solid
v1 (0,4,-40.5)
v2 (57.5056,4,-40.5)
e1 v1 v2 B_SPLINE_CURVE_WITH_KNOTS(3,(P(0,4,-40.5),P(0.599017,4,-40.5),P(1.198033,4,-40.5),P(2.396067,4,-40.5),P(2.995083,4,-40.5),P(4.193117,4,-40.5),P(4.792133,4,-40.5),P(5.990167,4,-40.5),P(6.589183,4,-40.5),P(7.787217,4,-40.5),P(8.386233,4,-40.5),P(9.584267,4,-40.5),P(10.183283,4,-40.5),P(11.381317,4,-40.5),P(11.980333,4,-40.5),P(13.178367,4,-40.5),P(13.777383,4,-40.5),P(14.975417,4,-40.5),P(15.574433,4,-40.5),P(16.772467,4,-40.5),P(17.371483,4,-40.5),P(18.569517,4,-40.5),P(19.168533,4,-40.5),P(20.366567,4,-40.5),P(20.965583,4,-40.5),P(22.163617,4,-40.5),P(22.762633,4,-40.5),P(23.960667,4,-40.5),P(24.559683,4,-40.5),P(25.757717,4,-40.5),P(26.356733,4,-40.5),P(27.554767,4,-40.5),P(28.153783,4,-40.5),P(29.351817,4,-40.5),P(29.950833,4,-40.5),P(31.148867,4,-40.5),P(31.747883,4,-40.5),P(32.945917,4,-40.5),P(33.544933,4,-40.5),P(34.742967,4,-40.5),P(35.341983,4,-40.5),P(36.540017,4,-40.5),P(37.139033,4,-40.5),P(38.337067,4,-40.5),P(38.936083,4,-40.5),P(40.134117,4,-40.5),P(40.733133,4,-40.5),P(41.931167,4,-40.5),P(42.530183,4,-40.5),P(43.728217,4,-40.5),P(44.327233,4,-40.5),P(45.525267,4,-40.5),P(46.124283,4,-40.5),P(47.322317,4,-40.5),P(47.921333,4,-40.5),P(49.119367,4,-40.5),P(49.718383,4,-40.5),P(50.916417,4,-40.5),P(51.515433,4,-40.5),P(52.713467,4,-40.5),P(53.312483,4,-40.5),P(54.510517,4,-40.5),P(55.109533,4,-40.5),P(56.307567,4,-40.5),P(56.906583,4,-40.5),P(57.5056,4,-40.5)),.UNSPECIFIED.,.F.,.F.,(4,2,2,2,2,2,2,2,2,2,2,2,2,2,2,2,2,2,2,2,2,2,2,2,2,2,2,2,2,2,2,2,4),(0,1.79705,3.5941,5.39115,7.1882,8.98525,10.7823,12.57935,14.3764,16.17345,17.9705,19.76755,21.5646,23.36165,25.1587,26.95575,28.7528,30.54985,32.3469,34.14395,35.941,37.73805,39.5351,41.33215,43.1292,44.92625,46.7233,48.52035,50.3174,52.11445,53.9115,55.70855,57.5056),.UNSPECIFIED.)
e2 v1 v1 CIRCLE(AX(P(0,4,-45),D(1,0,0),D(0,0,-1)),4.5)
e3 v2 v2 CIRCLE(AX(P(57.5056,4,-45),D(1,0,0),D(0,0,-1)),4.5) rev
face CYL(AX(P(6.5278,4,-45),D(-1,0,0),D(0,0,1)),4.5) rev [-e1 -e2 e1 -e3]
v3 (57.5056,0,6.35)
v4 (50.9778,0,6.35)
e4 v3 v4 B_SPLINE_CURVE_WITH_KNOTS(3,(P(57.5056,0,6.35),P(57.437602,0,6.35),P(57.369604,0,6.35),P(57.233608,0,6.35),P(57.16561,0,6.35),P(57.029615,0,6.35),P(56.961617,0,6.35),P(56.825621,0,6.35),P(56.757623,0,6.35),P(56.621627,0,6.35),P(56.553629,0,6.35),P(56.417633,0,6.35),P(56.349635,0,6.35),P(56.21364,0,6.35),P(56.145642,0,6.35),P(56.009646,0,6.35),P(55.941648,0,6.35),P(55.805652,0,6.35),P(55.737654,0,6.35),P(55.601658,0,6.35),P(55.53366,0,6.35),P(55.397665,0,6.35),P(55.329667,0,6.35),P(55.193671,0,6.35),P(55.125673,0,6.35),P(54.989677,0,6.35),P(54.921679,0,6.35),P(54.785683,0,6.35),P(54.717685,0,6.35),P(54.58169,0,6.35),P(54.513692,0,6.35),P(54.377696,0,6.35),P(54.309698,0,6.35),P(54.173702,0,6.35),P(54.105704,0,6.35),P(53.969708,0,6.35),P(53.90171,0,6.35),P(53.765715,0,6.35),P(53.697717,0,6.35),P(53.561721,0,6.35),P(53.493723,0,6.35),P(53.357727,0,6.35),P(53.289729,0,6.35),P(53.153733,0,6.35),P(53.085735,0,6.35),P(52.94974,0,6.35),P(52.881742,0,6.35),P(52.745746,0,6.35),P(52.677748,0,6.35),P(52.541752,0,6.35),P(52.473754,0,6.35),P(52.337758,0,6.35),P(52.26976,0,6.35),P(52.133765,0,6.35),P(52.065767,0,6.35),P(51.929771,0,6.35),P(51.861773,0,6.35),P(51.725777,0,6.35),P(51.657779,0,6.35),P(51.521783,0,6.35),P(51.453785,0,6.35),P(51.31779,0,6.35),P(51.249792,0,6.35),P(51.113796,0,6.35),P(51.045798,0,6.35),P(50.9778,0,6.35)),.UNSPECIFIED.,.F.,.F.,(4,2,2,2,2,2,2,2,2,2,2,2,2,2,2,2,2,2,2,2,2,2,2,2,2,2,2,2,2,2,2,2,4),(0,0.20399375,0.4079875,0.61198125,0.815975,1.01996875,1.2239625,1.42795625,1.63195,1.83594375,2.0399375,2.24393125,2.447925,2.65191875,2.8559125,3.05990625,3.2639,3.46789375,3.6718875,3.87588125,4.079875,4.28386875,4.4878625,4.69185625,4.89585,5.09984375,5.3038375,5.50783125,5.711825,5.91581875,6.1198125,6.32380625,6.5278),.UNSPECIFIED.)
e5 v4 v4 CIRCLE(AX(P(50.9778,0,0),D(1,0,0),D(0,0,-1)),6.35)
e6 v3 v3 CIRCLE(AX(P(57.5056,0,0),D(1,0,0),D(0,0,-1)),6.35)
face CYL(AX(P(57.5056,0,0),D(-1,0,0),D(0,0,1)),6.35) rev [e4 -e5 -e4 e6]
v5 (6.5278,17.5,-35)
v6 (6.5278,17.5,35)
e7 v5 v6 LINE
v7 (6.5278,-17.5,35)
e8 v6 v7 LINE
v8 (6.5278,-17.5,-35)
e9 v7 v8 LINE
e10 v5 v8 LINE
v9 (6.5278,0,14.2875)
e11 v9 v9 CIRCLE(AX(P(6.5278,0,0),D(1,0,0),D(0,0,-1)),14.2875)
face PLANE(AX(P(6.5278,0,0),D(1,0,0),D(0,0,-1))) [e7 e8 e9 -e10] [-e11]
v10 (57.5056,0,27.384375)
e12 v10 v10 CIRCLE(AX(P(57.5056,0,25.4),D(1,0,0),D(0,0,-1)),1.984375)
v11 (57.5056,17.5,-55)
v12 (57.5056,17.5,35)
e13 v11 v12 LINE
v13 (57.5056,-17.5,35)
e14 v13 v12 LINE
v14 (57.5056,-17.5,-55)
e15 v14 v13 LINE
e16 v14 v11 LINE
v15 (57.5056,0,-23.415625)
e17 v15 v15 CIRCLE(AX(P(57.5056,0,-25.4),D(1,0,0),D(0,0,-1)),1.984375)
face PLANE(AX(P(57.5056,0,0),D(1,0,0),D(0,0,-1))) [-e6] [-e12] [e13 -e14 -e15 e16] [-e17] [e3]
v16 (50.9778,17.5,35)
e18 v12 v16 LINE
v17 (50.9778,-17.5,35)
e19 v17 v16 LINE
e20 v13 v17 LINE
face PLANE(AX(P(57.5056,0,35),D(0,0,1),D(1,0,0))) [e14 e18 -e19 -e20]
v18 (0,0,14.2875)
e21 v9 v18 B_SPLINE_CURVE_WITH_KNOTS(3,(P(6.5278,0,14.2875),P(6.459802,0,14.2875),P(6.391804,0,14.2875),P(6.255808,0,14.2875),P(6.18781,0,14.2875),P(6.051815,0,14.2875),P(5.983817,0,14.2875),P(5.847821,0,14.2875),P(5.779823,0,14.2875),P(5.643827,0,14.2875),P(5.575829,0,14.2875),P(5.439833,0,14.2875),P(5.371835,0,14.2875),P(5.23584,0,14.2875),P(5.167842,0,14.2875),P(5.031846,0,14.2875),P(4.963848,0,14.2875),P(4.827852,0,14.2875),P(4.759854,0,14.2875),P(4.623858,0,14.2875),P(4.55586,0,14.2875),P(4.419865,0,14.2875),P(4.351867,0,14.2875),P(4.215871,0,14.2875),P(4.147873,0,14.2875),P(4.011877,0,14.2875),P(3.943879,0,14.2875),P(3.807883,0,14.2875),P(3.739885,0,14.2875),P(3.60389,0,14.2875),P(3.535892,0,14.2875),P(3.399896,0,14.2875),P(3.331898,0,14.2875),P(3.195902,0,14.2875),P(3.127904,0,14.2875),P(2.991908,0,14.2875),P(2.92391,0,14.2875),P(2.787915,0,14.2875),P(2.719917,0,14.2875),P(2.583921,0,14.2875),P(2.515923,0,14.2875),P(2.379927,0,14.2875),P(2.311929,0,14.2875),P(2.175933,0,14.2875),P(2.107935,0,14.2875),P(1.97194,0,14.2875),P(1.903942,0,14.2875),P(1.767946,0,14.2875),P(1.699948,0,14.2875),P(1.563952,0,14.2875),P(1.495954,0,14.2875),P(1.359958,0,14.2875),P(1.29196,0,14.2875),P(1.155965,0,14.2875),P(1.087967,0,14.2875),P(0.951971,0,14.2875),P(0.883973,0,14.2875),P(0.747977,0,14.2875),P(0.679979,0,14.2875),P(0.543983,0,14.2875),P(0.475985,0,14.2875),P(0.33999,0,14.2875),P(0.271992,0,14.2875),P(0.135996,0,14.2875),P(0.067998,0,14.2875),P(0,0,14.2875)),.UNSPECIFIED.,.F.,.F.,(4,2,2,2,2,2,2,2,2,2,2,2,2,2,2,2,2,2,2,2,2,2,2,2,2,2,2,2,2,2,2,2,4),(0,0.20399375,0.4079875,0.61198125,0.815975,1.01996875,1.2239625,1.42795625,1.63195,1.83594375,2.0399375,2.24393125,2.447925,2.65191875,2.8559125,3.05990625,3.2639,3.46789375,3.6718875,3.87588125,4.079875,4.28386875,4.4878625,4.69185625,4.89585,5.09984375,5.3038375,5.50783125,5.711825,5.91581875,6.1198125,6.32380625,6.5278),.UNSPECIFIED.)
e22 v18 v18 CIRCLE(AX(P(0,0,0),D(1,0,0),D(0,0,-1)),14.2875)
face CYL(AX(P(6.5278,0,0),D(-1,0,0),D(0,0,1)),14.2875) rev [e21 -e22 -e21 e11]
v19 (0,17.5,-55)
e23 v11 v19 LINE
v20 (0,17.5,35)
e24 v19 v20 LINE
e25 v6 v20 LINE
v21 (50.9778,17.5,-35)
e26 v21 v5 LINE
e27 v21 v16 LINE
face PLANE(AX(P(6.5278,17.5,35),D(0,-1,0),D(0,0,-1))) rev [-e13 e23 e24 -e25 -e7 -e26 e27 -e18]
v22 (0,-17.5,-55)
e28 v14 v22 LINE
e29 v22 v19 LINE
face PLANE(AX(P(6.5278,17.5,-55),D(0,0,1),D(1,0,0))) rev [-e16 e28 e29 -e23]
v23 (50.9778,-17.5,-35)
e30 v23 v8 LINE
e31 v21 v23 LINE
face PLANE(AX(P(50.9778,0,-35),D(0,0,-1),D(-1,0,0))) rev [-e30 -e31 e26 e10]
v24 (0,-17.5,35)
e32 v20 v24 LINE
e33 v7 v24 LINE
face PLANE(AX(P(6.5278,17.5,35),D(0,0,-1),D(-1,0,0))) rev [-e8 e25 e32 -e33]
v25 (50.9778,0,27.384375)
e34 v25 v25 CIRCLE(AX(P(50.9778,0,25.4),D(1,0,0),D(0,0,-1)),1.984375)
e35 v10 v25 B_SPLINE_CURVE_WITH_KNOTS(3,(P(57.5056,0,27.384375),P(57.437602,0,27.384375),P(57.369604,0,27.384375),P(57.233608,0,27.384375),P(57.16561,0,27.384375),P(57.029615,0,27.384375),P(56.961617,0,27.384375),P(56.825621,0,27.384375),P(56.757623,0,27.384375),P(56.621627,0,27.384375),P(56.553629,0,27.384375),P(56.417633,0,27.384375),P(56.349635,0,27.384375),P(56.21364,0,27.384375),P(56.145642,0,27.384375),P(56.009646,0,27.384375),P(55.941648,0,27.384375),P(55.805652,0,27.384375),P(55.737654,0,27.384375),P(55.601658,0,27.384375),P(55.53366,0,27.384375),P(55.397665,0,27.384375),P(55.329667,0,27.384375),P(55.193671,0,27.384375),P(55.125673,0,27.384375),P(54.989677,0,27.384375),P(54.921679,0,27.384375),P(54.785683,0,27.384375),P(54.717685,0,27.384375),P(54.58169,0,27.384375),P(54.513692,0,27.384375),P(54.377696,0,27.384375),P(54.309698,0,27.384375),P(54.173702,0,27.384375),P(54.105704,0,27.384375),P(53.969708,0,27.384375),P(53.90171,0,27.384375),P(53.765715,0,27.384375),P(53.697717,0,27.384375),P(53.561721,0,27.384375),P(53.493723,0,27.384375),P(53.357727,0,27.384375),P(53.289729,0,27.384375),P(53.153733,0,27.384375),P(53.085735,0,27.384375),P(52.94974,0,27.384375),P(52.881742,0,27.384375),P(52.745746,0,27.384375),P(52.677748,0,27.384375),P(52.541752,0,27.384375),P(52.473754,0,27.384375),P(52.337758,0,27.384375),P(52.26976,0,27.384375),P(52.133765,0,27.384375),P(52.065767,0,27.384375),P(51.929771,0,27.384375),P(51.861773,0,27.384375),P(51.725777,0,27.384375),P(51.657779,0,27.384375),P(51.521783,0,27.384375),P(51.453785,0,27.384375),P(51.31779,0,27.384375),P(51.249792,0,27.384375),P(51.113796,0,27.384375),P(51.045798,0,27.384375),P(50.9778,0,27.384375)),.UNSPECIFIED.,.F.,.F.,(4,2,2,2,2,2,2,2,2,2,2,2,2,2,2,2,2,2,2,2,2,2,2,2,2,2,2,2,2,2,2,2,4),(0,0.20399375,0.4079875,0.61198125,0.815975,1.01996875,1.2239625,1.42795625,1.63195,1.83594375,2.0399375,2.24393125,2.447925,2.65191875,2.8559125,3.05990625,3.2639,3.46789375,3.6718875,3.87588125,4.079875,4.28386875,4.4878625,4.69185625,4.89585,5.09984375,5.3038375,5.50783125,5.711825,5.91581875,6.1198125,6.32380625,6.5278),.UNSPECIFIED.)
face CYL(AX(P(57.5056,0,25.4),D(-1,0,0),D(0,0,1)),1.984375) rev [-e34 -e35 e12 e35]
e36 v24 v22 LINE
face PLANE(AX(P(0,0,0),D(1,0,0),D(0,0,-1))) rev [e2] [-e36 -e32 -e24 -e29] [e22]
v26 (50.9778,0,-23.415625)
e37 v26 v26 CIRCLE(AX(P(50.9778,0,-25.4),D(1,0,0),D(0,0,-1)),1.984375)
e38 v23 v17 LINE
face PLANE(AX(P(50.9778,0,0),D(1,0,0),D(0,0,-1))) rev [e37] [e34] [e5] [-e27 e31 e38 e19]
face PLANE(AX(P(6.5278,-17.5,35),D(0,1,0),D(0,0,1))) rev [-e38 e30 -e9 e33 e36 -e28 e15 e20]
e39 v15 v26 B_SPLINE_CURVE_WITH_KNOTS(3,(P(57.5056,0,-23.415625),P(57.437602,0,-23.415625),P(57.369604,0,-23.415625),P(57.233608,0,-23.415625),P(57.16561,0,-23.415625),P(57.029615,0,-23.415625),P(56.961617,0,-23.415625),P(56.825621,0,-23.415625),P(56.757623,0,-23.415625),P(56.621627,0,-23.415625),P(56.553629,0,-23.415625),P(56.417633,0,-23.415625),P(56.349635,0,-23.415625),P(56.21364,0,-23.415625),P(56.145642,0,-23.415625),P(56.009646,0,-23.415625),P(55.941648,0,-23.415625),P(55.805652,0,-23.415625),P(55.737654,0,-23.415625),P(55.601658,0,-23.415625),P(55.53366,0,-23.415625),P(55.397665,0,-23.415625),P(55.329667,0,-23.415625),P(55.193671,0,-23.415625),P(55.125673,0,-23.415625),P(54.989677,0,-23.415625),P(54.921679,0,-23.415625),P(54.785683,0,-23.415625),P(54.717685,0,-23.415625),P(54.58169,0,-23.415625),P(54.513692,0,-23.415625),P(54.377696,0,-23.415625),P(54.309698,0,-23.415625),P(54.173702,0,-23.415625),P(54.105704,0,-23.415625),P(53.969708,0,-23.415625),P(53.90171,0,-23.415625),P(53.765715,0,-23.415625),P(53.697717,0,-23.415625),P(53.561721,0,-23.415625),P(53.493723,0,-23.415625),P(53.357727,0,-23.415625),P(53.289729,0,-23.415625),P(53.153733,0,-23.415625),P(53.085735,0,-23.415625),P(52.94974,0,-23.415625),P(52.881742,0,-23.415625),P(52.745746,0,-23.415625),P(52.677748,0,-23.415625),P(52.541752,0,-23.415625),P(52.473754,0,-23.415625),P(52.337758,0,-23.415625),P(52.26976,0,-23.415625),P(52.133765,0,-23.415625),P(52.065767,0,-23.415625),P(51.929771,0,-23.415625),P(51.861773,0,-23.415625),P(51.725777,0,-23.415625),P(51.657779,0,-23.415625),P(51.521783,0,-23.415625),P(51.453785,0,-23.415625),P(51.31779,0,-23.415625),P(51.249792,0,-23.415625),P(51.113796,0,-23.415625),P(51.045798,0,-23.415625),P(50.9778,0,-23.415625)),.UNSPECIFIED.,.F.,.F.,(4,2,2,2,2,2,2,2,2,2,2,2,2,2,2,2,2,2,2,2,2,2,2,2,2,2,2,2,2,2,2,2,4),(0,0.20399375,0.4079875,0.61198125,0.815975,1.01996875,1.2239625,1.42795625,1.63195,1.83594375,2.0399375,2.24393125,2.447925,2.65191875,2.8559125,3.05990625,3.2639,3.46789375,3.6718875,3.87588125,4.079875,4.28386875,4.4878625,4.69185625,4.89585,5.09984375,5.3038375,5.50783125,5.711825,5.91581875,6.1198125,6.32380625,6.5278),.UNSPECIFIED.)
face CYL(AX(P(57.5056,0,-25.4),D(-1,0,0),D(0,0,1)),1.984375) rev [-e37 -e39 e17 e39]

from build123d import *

# Parameters (mm, degrees)
SKETCH1_W           = 90
SKETCH1_H           = 35
SKETCH1_R           = 14.2875
SKETCH1_R_2         = 4.5
BOSS_EXTRUDE1_DEPTH = 6.5278
SKETCH2_W           = 20
SKETCH2_H           = 35
SKETCH2_R           = 4.5
BOSS_EXTRUDE2_DEPTH = 44.45
SKETCH3_R           = 1.984375
SKETCH3_R_2         = 4.5
BOSS_EXTRUDE3_DEPTH = 6.5278


with BuildPart() as part:
    # Sketch1 → Boss-Extrude1 (new body)
    with BuildSketch(Plane(origin=(0, 0, 0), x_dir=(0, 0, -1), z_dir=(1, 0, 0))):
        with Locations((10, 0)):
            Rectangle(SKETCH1_W, SKETCH1_H)
        Circle(SKETCH1_R, mode=Mode.SUBTRACT)
        with Locations((45, 4)):
            Circle(SKETCH1_R_2, mode=Mode.SUBTRACT)
    extrude(amount=BOSS_EXTRUDE1_DEPTH)

    # Sketch2 → Boss-Extrude2 (add)
    with BuildSketch(Plane(origin=(6.5278, 0, 0), x_dir=(0, 0, -1), z_dir=(1, 0, 0))):
        with Locations((45, 0)):
            Rectangle(SKETCH2_W, SKETCH2_H)
        with Locations((45, 4)):
            Circle(SKETCH2_R, mode=Mode.SUBTRACT)
    extrude(amount=BOSS_EXTRUDE2_DEPTH)

    # Sketch3 → Boss-Extrude3 (add)
    with BuildSketch(Plane(origin=(50.9778, 0, 0), x_dir=(0, 0, -1), z_dir=(1, 0, 0))):
        Polygon((-35, 17.5), (-35, 0), (-35, -17.5), (55, -17.5), (55, 17.5), align=None)
        with BuildLine():
            ThreePointArc((-27.384375, 0), (-25.4, 1.984375), (-23.415625, 0))
            ThreePointArc((-23.415625, 0), (-25.4, -1.984375), (-27.384375, 0))
        make_face(mode=Mode.SUBTRACT)
        with BuildLine():
            ThreePointArc((6.35, 0), (0, -6.35), (-6.35, 0))
            ThreePointArc((-6.35, 0), (0, 6.35), (6.35, 0))
        make_face(mode=Mode.SUBTRACT)
        with Locations((25.4, 0)):
            Circle(SKETCH3_R, mode=Mode.SUBTRACT)
        with Locations((45, 4)):
            Circle(SKETCH3_R_2, mode=Mode.SUBTRACT)
    extrude(amount=BOSS_EXTRUDE3_DEPTH)


solid = part.part
